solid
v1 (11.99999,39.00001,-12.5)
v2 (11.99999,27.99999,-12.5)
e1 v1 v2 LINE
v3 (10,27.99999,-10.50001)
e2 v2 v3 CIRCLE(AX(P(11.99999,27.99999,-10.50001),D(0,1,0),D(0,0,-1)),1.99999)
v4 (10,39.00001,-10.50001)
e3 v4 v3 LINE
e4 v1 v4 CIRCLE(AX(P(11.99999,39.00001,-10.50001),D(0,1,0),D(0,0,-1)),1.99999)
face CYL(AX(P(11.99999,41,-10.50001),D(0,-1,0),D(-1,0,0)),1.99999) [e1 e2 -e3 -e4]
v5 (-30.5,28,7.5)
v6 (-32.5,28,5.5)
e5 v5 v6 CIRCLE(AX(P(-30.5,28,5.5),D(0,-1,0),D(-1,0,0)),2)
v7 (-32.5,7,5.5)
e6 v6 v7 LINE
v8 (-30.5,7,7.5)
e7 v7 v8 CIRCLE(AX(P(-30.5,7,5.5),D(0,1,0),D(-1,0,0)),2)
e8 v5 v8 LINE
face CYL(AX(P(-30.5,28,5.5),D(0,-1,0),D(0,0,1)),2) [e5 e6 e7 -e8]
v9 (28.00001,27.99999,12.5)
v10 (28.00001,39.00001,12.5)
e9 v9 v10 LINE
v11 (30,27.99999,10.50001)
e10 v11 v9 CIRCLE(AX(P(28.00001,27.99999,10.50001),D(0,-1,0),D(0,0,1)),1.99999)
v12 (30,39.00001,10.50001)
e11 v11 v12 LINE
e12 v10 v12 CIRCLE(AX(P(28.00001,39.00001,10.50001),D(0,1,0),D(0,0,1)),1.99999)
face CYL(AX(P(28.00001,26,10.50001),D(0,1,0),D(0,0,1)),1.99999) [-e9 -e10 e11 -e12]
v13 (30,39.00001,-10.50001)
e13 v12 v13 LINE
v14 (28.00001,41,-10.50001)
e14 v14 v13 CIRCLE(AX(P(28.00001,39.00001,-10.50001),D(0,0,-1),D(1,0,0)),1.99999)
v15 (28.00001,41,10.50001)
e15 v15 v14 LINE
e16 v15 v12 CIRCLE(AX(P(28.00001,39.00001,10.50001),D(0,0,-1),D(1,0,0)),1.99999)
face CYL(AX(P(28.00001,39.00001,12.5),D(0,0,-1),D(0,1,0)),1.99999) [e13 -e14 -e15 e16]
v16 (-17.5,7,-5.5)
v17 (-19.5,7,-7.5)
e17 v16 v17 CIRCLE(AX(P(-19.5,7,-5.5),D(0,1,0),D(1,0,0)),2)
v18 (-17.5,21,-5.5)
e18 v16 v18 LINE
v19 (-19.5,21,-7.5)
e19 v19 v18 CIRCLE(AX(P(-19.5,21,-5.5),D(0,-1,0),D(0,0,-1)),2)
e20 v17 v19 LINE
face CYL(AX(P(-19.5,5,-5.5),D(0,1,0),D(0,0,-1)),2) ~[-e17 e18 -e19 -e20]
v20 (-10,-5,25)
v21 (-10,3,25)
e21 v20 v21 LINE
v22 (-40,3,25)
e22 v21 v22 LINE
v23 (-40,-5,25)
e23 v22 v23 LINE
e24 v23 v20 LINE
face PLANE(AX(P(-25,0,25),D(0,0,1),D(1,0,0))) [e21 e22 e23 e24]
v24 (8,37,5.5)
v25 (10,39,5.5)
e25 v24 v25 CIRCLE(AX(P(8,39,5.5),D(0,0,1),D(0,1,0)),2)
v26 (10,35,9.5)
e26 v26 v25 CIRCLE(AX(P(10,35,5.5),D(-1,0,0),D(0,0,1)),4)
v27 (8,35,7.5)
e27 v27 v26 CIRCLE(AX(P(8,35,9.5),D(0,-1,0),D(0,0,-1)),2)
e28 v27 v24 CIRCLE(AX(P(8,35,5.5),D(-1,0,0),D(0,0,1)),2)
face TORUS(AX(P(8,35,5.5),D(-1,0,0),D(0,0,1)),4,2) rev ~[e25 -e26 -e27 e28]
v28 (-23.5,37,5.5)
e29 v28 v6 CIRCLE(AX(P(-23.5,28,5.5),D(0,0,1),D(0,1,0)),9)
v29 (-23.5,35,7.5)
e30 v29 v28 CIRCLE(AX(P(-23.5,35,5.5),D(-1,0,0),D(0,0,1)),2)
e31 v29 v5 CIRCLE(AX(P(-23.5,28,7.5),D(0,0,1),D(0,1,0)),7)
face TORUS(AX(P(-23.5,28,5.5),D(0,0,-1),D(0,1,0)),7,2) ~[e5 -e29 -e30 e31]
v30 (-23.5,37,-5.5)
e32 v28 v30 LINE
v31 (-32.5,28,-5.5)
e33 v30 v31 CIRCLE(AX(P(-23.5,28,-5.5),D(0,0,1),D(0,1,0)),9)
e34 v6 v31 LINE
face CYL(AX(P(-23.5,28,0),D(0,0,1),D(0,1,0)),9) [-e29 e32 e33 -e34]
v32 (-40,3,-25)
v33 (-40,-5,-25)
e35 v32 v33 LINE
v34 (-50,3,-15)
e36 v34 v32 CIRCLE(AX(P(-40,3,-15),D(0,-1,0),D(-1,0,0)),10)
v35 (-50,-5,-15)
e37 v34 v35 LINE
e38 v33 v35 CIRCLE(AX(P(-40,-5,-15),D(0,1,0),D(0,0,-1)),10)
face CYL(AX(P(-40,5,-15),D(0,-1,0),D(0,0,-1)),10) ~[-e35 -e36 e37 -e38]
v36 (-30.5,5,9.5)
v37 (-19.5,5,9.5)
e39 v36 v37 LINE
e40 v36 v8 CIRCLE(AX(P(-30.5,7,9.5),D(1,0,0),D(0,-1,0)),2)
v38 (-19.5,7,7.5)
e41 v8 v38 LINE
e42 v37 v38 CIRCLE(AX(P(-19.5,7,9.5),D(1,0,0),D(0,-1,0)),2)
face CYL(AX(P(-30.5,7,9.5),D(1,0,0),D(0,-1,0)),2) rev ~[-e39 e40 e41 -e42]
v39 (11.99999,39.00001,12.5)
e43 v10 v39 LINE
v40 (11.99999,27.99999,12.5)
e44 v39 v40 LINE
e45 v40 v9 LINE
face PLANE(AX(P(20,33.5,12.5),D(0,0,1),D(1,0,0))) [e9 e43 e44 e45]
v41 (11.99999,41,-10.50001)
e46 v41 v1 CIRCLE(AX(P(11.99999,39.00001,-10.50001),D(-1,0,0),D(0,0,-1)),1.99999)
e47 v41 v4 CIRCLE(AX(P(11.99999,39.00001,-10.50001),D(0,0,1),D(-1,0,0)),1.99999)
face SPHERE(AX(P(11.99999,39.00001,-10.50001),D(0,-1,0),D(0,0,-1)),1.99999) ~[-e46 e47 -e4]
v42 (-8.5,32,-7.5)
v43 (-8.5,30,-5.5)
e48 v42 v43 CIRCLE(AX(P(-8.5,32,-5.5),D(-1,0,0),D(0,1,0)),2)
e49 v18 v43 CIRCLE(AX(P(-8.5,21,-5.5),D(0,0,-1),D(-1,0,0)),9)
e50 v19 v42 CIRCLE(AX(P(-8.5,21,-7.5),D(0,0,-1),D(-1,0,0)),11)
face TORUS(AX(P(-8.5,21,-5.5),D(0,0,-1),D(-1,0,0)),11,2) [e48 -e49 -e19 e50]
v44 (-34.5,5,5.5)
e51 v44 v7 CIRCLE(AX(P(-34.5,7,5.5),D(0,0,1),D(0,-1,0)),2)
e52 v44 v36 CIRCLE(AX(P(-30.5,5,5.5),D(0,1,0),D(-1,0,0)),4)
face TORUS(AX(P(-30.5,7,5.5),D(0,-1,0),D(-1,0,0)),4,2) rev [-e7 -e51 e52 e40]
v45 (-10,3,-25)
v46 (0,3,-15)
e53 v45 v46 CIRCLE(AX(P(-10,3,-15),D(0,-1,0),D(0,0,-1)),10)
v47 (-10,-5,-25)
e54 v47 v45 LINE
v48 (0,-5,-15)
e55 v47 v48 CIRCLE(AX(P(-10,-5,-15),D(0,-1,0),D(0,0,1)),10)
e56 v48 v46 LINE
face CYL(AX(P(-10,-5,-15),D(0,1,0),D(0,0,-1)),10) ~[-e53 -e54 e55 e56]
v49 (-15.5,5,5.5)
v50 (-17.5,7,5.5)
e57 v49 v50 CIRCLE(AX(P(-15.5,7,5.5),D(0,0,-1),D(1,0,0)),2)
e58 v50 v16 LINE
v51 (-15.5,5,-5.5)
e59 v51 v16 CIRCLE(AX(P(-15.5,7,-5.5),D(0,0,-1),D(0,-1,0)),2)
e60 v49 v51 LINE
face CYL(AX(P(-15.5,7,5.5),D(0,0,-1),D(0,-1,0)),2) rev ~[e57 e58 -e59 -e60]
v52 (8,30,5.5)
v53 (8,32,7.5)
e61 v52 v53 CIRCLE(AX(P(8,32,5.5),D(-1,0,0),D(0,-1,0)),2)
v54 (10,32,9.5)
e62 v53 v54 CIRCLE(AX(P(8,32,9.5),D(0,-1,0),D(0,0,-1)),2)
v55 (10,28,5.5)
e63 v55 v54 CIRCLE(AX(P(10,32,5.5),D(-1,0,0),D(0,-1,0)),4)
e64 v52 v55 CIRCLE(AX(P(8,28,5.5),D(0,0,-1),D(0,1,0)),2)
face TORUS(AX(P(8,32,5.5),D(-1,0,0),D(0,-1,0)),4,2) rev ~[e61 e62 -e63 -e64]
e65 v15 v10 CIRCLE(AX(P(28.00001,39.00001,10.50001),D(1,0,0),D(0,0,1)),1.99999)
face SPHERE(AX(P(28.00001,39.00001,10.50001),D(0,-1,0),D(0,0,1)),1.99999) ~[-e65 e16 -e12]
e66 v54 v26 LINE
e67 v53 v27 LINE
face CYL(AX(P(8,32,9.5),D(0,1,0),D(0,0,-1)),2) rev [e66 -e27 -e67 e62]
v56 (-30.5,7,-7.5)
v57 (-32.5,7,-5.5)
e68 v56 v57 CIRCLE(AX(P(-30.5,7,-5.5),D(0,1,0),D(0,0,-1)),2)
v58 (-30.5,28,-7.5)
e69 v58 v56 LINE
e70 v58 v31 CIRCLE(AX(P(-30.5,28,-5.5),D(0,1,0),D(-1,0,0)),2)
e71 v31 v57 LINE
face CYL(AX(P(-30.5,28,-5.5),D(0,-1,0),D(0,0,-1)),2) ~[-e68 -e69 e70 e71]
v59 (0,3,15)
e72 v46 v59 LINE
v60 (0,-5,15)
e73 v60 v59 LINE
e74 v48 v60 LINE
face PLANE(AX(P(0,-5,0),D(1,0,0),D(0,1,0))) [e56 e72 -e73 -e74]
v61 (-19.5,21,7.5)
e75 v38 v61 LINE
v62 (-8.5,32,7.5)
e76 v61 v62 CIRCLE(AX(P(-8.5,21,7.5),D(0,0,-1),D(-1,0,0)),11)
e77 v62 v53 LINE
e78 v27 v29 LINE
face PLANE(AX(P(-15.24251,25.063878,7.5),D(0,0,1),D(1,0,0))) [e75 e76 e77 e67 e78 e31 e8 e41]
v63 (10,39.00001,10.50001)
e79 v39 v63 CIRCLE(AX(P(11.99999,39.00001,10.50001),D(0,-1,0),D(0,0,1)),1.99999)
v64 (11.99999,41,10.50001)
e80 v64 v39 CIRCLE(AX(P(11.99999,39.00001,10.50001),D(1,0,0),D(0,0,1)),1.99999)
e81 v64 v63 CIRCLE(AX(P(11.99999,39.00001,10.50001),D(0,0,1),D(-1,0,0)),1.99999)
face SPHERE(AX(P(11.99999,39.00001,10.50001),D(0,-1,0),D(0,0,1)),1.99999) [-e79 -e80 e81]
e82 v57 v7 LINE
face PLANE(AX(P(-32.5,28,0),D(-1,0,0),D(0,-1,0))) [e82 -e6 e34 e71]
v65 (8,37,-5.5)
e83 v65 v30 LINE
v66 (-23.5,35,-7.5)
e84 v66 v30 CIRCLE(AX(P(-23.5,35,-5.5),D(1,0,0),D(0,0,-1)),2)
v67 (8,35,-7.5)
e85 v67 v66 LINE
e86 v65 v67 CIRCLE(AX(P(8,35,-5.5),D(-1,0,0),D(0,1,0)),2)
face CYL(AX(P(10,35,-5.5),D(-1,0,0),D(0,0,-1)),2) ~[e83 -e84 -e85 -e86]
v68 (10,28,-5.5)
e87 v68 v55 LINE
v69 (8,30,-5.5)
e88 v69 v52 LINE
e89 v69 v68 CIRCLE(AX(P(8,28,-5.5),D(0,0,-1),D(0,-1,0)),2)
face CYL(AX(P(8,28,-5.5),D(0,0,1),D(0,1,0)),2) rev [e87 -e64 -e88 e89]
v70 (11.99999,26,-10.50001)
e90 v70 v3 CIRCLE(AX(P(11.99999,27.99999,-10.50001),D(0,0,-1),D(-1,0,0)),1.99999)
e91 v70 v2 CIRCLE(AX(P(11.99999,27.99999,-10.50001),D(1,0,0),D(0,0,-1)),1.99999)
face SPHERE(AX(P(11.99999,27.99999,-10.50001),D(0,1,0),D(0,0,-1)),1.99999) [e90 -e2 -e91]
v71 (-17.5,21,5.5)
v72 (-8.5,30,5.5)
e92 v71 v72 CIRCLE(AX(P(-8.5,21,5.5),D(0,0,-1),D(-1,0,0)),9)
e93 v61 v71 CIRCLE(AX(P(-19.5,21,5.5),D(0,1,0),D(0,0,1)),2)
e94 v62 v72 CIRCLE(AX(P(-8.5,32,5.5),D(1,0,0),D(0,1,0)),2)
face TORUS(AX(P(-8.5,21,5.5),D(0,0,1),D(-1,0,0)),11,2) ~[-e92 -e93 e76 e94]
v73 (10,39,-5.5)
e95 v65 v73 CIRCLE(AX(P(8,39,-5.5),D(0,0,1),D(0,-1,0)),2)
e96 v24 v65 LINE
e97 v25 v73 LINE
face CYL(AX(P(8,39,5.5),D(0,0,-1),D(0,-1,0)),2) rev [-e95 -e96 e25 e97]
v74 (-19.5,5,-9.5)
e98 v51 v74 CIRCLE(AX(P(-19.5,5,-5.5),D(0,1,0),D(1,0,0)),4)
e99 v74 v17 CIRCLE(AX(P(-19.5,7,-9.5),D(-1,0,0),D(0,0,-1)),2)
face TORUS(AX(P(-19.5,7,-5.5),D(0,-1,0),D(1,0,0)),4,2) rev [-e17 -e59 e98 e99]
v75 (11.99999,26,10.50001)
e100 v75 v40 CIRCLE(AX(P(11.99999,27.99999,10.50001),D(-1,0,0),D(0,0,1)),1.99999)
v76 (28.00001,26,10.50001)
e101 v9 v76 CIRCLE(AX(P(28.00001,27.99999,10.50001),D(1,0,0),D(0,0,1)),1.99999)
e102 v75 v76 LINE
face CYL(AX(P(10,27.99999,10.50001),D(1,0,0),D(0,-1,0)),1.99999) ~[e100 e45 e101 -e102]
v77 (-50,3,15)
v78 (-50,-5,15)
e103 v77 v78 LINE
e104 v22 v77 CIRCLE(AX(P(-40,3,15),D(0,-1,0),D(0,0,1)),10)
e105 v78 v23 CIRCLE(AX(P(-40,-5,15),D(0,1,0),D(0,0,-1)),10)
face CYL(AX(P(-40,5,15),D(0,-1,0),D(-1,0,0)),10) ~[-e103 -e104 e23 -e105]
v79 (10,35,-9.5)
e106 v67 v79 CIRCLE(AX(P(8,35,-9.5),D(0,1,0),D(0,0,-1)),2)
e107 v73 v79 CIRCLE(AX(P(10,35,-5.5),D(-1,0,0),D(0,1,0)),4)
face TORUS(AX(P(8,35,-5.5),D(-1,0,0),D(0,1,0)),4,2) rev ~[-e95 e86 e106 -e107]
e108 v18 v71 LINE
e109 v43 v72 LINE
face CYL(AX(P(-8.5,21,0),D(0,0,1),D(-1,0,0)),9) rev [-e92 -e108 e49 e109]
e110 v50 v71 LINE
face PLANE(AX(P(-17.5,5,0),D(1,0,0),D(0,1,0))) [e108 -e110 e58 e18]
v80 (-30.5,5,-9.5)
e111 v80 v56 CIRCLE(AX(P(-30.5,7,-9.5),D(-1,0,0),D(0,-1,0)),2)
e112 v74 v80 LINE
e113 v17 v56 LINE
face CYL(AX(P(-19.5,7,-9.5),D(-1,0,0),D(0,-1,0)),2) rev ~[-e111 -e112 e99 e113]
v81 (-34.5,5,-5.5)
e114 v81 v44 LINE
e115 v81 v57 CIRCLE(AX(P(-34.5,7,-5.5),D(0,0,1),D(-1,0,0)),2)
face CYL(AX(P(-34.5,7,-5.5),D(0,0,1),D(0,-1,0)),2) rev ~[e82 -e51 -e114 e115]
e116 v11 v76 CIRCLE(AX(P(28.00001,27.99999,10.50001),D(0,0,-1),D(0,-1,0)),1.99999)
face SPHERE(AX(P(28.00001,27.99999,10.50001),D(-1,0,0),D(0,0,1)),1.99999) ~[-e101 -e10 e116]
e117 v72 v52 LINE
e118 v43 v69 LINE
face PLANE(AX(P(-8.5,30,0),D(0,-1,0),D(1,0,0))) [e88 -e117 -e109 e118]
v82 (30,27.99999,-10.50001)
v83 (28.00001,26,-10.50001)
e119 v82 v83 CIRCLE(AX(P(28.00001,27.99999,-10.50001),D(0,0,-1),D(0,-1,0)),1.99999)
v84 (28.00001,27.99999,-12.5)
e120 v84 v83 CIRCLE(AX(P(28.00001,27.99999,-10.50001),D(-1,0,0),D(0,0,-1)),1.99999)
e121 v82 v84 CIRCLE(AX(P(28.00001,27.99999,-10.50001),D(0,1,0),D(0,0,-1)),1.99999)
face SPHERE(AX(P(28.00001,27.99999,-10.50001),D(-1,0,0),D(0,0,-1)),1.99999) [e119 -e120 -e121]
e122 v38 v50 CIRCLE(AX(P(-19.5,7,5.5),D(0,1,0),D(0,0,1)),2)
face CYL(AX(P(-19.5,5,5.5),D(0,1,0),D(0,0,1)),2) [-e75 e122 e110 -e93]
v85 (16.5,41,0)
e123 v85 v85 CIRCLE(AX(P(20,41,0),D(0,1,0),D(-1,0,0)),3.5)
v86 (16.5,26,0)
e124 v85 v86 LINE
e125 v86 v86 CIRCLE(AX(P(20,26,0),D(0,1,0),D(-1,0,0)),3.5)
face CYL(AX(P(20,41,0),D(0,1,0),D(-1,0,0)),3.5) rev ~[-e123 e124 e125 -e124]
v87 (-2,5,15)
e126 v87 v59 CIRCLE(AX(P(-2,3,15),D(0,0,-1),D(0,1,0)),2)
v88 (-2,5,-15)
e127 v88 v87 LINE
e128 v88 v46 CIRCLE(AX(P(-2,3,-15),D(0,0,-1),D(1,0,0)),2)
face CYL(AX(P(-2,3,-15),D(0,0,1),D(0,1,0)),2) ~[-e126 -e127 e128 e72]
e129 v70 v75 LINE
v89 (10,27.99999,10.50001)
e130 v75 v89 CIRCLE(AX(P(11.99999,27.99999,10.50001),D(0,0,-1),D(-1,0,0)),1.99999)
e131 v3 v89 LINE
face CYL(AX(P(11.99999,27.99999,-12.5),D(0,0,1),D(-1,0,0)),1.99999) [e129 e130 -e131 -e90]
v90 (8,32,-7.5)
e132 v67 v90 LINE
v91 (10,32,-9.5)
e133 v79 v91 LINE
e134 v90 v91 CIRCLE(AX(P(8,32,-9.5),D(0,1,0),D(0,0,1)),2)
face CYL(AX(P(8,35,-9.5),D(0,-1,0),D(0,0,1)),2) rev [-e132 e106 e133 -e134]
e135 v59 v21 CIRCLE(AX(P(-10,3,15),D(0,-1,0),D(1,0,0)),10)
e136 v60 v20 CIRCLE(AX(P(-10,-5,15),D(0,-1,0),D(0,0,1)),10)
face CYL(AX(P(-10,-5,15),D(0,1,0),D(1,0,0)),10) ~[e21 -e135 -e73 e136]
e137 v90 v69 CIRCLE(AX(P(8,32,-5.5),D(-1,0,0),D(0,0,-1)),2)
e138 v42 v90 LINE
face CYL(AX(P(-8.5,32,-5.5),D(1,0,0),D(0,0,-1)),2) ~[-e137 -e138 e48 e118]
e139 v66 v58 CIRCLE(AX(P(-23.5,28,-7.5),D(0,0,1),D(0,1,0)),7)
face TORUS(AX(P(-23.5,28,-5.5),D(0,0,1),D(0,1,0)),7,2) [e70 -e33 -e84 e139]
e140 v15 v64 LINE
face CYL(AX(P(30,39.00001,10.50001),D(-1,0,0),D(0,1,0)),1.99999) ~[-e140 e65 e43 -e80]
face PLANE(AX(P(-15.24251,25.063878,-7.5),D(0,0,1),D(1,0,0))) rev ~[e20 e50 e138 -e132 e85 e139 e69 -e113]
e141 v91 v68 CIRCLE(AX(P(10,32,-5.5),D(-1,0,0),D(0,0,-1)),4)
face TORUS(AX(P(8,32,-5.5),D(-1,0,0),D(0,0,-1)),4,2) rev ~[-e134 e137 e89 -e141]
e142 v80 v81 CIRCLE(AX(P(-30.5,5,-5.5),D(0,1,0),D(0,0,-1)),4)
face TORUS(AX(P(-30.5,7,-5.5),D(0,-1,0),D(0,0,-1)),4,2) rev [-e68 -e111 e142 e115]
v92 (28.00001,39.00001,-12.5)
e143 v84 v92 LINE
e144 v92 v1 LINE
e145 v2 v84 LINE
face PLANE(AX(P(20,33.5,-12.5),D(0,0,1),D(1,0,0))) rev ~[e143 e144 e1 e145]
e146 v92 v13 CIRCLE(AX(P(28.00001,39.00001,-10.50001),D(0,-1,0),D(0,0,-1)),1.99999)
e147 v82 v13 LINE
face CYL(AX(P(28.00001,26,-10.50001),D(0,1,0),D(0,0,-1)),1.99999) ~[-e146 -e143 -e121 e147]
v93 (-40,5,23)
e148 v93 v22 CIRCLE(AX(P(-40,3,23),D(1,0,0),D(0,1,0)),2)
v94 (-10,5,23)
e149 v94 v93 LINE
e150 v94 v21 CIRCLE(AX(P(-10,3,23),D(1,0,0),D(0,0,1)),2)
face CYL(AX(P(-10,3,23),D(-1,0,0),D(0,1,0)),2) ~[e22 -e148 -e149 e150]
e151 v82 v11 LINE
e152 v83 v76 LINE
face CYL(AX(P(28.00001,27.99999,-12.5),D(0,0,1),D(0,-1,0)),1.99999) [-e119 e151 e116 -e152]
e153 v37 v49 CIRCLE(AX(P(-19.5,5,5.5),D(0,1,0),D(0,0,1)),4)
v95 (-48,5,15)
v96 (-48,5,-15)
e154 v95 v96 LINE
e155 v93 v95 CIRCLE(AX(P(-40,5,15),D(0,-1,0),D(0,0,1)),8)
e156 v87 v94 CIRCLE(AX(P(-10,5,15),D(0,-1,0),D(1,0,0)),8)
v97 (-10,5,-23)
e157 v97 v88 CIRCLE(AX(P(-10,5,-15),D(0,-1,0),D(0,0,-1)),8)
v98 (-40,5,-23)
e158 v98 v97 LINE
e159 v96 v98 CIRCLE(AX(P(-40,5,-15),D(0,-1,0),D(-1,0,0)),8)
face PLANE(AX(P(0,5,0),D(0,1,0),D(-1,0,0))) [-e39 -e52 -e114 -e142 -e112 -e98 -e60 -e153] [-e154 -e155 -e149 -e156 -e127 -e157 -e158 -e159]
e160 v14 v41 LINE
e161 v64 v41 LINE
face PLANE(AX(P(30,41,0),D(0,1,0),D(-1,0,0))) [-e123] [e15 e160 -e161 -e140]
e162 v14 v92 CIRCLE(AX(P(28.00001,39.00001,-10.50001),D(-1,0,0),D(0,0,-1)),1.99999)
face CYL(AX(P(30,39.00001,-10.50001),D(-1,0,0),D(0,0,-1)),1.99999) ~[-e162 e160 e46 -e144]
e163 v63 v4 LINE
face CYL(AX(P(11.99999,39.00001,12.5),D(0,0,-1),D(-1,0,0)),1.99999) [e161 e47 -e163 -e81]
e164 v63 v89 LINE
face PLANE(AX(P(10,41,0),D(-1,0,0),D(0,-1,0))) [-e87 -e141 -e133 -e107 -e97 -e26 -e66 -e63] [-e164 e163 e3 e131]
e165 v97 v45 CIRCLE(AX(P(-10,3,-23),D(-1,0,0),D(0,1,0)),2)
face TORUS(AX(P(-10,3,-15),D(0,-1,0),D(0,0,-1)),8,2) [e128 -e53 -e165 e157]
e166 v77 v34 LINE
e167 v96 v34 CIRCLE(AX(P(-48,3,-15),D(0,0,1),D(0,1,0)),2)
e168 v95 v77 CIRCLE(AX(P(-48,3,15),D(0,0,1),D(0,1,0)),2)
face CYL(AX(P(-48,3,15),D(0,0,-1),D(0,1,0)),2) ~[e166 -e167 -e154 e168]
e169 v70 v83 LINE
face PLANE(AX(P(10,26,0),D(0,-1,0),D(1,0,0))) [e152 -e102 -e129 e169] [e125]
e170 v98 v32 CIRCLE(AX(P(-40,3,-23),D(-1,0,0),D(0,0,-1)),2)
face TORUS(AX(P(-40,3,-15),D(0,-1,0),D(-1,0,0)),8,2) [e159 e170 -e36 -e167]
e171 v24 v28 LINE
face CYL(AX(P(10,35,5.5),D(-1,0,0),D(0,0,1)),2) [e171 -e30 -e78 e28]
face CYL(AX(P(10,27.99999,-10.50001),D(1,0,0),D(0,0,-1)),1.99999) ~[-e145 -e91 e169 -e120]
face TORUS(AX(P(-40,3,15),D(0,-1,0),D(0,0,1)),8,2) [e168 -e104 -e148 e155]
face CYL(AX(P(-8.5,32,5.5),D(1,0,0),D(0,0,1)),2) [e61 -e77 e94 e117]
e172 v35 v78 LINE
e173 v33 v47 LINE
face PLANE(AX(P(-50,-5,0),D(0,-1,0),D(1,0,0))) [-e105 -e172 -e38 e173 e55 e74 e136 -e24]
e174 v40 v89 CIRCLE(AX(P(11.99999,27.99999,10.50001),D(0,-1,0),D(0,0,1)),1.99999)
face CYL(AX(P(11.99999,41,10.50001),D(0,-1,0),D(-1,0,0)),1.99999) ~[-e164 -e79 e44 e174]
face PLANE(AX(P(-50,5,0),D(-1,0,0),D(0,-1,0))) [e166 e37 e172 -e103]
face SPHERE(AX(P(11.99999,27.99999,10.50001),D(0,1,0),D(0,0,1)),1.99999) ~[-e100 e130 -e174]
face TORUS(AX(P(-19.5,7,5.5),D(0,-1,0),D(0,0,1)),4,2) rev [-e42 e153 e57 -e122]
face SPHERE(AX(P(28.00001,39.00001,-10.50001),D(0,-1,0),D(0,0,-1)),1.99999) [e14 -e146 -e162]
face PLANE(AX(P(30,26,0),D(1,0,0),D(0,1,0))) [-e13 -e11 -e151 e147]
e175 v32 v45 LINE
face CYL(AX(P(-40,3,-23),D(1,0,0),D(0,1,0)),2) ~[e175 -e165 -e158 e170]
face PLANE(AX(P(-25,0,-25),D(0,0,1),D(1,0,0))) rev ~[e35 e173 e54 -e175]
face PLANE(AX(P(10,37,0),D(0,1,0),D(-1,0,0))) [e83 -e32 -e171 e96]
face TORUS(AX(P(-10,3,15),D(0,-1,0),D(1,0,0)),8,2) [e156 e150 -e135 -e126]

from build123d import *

# Parameters (mm, degrees)
F1_DEPTH = 25
F2_DEPTH = 7.5
F3_DEPTH = 12.5
F4_R     = 10
F5_F1_R  = 2
F5_F2_R  = 2
F6_R     = 3.5
F7_DEPTH = 15
F8_R     = 1.99999


# Not quite as in the source:
# - a fillet or chamfer is up to 0.001 mm smaller than in the source, because OpenCascade refuses the exact size


with BuildPart() as f1:
    # F0 (on Top) → F1 (new body, symmetric)
    with BuildSketch(Plane.XY):
        Polygon((-32.5, 5), (-50, 5), (-50, -5), (0, -5), (0, 5), (-17.5, 5), align=None)
    extrude(amount=F1_DEPTH, both=True)

    # F0 (on Top) → F2 (join, symmetric)
    with BuildSketch(Plane.XY):
        with BuildLine():
            Line((-32.5, 28), (-32.5, 5))
            Line((-32.5, 5), (-17.5, 5))
            Line((-17.5, 5), (-17.5, 21))
            ThreePointArc((-17.5, 21), (-14.8639610307, 27.3639610307), (-8.5, 30))
            Line((-8.5, 30), (10, 30))
            Line((10, 30), (10, 37))
            Line((10, 37), (-23.5, 37))
            ThreePointArc((-23.5, 37), (-29.8639610307, 34.3639610307), (-32.5, 28))
        make_face()
    extrude(amount=F2_DEPTH, both=True)

    # F0 (on Top) → F3 (join, symmetric)
    with BuildSketch(Plane.XY):
        Polygon((10, 41), (10, 37), (10, 30), (10, 26), (30, 26), (30, 41), align=None)
    extrude(amount=F3_DEPTH, both=True)

    # F4
    f4_edges = [f1.edges().sort_by_distance(p)[0] for p in [
        (-50, 0, 25),
        (0, 0, 25),
        (0, 0, -25),
        (-50, 0, -25),
    ]]
    fillet(f4_edges, radius=F4_R)

    # F5: fillet of radius 2 on 26 edges, made by hand

    # F5_f1
    f5_f1_edges = [f1.edges().sort_by_distance(p)[0] for p in [
        (0.75, 30, 7.5),
        (-6.75, 37, 7.5),
        (-29.8639610307, 34.3639610307, 7.5),
        (-32.5, 16.5, 7.5),
        (-17.5, 13, 7.5),
        (-14.8639610307, 27.3639610307, 7.5),
        (0.75, 30, -7.5),
        (-6.75, 37, -7.5),
        (-29.8639610307, 34.3639610307, -7.5),
        (-32.5, 16.5, -7.5),
        (-17.5, 13, -7.5),
        (-14.8639610307, 27.3639610307, -7.5),
        (-50, 5, 0),
        (-47.0710678119, 5, -22.0710678119),
        (-47.0710678119, 5, 22.0710678119),
        (-25, 5, -25),
        (-25, 5, 25),
        (-2.9289321881, 5, -22.0710678119),
        (-2.9289321881, 5, 22.0710678119),
        (0, 5, 0),
    ]]
    fillet(f5_f1_edges, radius=F5_F1_R)

    # F5_f2
    f5_f2_edges = [f1.edges().sort_by_distance(p)[0] for p in [
        (10, 33.5, 7.5),
        (-25, 5, 7.5),
        (10, 33.5, -7.5),
        (-25, 5, -7.5),
        (-17.5, 5, 0),
        (-32.5, 5, 0),
        (-31.9142135624, 5, -6.9142135624),
        (-31.9142135624, 5, 6.9142135624),
        (-18.0857864376, 5, 6.9142135624),
        (-18.0857864376, 5, -6.9142135624),
        (10, 30.5857864376, -6.9142135624),
        (10, 36.4142135624, -6.9142135624),
        (10, 30.5857864376, 6.9142135624),
        (10, 36.4142135624, 6.9142135624),
    ]]
    fillet(f5_f2_edges, radius=F5_F2_R)

    # F6 (on face) → F7 (cut, through all)
    with BuildSketch(Plane(origin=(0, 41, 0), x_dir=(-1, 0, 0), z_dir=(0, 1, 0))):
        with Locations((-20, 0)):
            Circle(F6_R)
    extrude(amount=-F7_DEPTH, mode=Mode.SUBTRACT)

    # F8 (radius 2 in the source; OpenCascade refuses exactly that, so slightly less here)
    f8_edges = [f1.edges().sort_by_distance(p)[0] for p in [
        (10, 33.5, -12.5),
        (20, 26, -12.5),
        (30, 33.5, -12.5),
        (20, 41, -12.5),
        (10, 33.5, 12.5),
        (20, 26, 12.5),
        (30, 33.5, 12.5),
        (20, 41, 12.5),
        (30, 41, 0),
        (30, 26, 0),
        (10, 41, 0),
        (10, 26, 0),
    ]]
    fillet(f8_edges, radius=F8_R)


solid = f1.part
